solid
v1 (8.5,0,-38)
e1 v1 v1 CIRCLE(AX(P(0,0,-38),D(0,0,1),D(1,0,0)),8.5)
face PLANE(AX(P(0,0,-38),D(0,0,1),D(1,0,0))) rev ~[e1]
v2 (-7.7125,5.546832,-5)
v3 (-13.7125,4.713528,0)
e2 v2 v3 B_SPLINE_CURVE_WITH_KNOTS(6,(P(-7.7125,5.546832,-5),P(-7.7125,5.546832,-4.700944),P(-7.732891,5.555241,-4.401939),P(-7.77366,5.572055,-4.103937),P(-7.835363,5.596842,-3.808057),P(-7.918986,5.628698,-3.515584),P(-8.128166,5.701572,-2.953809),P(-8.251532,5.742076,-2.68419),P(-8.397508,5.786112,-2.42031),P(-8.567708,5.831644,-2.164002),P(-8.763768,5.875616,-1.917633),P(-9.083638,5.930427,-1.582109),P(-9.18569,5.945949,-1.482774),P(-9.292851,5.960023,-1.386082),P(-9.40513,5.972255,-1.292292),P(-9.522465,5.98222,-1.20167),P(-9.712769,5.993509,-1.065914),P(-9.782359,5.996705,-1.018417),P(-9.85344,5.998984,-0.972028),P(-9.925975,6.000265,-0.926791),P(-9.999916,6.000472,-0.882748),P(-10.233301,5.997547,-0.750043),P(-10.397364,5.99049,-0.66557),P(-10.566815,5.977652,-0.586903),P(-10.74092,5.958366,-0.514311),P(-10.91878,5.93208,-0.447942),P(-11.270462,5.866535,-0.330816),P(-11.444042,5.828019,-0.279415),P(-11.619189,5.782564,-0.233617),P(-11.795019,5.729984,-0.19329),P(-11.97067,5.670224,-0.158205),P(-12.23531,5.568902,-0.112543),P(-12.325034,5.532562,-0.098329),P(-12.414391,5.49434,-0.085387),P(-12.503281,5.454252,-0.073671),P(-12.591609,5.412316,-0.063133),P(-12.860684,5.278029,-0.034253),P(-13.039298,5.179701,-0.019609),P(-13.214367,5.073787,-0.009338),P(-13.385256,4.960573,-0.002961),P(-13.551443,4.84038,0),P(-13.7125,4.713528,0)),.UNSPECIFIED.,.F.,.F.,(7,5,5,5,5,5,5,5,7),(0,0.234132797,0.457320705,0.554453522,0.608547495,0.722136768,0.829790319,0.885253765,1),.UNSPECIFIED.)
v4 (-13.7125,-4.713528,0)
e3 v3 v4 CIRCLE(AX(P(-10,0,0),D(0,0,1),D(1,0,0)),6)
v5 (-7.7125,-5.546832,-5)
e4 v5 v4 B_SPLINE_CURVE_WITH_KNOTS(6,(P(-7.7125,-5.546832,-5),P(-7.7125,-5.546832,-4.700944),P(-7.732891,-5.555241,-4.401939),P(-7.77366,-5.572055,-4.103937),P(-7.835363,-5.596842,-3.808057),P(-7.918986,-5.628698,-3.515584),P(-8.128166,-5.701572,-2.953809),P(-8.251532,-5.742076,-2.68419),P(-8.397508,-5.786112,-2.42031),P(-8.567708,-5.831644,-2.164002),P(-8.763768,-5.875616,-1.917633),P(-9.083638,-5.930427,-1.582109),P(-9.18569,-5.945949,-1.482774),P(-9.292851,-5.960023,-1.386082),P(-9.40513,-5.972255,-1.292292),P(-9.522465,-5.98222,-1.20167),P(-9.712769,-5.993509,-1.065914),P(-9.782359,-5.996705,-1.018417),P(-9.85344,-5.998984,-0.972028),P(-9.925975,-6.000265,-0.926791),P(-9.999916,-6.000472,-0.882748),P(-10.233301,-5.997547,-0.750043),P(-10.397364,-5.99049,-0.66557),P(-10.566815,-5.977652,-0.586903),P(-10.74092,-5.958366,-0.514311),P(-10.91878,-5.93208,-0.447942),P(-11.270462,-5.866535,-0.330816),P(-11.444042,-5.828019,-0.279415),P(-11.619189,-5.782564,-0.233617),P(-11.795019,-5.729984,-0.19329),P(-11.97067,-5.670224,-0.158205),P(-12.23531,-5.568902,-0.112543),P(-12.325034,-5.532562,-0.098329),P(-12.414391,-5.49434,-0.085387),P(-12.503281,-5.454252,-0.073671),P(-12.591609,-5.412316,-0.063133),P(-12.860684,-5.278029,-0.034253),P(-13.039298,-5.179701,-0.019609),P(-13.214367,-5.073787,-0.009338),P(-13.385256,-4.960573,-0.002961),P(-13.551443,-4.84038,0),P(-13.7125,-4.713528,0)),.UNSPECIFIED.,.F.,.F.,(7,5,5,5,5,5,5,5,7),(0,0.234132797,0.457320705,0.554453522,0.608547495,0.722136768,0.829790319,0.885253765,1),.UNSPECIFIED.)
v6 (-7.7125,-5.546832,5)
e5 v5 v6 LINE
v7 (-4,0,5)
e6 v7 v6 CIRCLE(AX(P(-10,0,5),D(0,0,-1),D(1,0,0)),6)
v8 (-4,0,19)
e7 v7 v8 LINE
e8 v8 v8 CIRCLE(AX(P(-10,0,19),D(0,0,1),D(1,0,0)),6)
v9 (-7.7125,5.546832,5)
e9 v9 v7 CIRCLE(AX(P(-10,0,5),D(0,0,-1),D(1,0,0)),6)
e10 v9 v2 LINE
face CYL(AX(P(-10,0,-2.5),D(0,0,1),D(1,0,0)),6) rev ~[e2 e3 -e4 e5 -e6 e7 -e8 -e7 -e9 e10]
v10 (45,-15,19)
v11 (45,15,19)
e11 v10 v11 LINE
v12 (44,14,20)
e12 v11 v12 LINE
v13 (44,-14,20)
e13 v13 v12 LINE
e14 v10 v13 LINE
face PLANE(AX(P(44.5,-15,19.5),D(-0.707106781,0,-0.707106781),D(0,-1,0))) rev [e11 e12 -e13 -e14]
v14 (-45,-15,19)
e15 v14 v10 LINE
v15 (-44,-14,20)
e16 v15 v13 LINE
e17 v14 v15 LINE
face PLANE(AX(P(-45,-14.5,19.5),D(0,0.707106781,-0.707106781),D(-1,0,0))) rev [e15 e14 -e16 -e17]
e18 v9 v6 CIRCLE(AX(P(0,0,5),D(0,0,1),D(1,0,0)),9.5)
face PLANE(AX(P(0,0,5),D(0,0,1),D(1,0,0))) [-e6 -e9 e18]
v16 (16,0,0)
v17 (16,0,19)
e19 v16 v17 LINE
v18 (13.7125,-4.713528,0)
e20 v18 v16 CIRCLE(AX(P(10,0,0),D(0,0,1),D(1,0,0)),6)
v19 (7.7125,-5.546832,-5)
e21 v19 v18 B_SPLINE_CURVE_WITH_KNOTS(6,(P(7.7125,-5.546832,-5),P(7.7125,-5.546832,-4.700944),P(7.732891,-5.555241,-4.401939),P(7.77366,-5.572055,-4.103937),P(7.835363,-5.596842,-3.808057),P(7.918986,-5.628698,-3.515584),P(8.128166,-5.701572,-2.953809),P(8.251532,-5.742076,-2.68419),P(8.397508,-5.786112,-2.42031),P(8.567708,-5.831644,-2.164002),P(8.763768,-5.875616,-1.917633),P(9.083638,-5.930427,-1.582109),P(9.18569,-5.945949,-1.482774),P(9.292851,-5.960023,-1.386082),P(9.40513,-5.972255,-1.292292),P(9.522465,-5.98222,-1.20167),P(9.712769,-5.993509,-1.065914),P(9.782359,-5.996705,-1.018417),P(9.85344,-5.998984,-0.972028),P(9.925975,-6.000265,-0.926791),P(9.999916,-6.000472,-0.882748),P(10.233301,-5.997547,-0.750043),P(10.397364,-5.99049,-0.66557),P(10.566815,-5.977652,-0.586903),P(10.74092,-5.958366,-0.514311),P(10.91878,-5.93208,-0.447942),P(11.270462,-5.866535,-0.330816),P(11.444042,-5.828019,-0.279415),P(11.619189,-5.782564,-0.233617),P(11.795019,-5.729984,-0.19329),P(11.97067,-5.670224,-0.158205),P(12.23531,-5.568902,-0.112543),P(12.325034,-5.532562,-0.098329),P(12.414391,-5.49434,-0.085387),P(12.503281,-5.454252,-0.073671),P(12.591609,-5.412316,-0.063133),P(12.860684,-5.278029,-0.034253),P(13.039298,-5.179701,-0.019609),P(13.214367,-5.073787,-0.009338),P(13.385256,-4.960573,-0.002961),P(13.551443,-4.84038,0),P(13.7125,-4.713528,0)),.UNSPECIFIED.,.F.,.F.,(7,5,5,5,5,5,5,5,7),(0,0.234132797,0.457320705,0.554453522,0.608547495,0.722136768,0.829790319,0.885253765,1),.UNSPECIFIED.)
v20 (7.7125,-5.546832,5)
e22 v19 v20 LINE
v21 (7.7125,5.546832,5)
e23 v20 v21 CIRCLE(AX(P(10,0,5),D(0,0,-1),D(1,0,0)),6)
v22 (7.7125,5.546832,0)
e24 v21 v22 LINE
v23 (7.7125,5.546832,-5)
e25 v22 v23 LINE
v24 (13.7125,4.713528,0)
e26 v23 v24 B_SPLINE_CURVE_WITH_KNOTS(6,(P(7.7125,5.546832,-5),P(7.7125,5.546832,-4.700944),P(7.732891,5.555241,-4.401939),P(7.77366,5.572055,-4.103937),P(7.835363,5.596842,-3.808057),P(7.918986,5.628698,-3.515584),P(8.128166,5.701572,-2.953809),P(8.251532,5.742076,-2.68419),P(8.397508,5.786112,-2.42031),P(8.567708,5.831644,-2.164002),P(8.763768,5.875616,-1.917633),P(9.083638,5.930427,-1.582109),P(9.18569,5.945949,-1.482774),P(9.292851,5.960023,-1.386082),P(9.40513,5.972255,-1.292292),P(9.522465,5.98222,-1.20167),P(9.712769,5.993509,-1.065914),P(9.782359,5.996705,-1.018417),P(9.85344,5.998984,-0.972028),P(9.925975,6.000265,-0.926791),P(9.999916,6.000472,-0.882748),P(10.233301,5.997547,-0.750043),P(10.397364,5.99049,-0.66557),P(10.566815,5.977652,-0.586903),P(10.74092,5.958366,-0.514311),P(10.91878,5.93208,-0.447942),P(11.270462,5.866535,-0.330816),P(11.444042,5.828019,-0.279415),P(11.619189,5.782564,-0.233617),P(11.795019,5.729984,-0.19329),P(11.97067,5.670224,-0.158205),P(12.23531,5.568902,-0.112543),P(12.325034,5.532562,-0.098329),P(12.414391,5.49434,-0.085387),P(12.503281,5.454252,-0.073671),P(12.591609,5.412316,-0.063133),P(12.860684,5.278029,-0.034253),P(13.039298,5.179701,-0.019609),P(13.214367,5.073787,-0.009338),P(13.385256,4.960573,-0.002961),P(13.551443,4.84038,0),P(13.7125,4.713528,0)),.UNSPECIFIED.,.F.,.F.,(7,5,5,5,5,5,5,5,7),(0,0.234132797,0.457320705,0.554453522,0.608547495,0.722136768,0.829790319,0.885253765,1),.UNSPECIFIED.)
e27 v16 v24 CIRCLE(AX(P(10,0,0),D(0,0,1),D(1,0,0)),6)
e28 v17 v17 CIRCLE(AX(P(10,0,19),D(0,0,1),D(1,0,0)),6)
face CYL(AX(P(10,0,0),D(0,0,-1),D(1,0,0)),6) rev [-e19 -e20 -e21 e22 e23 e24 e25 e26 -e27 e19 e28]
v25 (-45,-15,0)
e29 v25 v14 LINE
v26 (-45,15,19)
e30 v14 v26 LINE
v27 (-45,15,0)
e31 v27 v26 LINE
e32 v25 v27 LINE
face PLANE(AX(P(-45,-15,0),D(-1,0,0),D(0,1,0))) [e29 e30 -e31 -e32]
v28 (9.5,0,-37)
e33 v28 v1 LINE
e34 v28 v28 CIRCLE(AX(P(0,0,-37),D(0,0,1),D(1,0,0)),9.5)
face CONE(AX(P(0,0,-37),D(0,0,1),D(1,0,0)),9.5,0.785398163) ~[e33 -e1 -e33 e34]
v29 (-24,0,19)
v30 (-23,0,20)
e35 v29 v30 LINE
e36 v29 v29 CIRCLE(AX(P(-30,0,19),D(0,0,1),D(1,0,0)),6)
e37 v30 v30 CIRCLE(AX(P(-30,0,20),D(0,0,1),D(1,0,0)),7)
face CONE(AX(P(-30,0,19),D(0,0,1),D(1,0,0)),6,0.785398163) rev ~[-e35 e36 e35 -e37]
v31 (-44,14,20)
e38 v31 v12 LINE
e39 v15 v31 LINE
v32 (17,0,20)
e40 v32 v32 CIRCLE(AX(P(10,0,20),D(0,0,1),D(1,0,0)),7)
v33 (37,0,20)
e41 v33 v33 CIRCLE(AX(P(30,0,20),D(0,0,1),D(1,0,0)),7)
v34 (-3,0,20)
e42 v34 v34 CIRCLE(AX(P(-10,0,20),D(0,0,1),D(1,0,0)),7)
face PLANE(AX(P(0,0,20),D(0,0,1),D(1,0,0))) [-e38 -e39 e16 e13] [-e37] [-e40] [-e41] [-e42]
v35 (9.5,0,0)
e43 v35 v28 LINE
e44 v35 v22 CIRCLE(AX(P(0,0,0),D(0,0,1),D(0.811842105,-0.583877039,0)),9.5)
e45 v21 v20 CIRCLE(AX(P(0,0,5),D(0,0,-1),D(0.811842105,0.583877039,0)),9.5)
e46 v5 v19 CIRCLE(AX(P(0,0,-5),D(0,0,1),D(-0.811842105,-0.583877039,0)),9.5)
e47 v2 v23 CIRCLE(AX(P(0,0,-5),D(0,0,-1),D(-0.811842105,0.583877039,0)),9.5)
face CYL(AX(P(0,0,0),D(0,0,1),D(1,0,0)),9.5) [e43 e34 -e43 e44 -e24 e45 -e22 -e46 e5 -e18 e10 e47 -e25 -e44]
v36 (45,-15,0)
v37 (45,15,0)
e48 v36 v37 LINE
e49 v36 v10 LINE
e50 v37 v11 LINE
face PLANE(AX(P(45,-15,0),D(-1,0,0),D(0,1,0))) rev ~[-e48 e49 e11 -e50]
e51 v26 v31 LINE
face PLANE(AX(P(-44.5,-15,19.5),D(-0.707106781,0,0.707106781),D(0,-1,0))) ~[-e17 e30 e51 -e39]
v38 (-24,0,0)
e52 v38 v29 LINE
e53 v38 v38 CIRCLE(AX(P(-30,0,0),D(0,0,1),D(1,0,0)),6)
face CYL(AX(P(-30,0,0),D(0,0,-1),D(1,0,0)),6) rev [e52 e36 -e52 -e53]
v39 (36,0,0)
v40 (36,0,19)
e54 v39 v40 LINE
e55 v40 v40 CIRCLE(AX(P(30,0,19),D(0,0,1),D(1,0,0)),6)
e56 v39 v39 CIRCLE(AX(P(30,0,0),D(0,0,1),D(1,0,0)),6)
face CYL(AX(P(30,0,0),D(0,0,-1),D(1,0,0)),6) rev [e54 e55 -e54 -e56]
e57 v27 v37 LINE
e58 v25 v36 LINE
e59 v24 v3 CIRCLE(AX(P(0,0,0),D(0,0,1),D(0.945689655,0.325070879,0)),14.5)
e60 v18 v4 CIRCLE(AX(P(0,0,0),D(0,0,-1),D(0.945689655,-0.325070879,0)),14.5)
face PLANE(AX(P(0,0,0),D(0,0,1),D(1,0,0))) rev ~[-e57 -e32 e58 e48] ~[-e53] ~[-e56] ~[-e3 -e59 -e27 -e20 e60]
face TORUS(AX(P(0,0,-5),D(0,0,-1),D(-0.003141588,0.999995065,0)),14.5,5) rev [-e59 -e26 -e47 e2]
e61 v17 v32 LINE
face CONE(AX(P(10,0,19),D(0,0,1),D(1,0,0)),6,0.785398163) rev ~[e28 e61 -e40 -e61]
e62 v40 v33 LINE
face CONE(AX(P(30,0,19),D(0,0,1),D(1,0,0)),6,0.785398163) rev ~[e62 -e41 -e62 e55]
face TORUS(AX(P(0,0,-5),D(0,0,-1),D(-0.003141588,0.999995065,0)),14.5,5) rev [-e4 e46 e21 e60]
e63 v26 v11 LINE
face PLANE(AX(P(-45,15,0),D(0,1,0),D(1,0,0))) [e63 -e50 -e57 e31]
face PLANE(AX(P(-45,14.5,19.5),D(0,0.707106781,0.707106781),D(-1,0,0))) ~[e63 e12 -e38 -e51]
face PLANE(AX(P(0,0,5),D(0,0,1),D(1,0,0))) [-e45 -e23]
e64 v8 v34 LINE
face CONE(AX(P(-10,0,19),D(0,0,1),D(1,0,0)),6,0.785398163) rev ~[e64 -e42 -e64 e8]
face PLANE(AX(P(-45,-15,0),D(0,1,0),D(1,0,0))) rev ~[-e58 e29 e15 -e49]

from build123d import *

# Parameters (mm, degrees)
F0_W          = 90
F0_H          = 30
F0_R          = 6
F1_DEPTH      = 20
F2_SIZE       = 1
F3_R          = 9.5
F4_DEPTH      = 5
F4_DEPTH_BACK = 38
F5_SIZE       = 1
F6_T4_ANGLE   = 359.64
F6_S5_R       = 6
F6_T6_DEPTH   = 29
F6_S7_R       = 6
F6_T8_DEPTH   = 29
F6_T12_ANGLE  = 359.64
F6_S13_R      = 6
F6_T14_DEPTH  = 29
F6_S15_R      = 6
F6_T16_DEPTH  = 29


# Not quite as in the source:
# - a fillet or chamfer that OpenCascade refuses, or shapes differently, is made with other operations: its cross-section is extruded or revolved along the edge and cut away or added


with BuildPart() as f1:
    # F0 (on Top) → F1 (new body)
    with BuildSketch(Plane.XY):
        Rectangle(F0_W, F0_H)
        with Locations((-30, 0)):
            Circle(F0_R, mode=Mode.SUBTRACT)
        with Locations((-10, 0)):
            Circle(F0_R, mode=Mode.SUBTRACT)
        with Locations((10, 0)):
            Circle(F0_R, mode=Mode.SUBTRACT)
        with Locations((30, 0)):
            Circle(F0_R, mode=Mode.SUBTRACT)
    extrude(amount=F1_DEPTH)

    # F2
    f2_edges = [f1.edges().sort_by_distance(p)[0] for p in [
        (0, 15, 20),
        (-45, 0, 20),
        (0, -15, 20),
        (45, 0, 20),
        (-36, 0, 20),
        (-16, 0, 20),
        (4, 0, 20),
        (24, 0, 20),
    ]]
    chamfer(f2_edges, length=F2_SIZE)

    # F3 (on Top) → F4 (join, two sides)
    with BuildSketch(Plane.XY) as f4_sk:
        Circle(F3_R)
    extrude(amount=F4_DEPTH)
    extrude(f4_sk.sketch, amount=-F4_DEPTH_BACK)

    # F5
    f5_edges = [f1.edges().sort_by_distance(p)[0] for p in [
        (-9.5, 0, -38),
    ]]
    chamfer(f5_edges, length=F5_SIZE)

    # F6: fillet of radius 5 on 2 edges, made by hand


with BuildPart() as f6_tool2:
    # F6_s3 → F6_t4 (revolve)
    with BuildSketch(Plane(origin=(0, 0, 0), x_dir=(0, 0, 1), z_dir=(0.9999950652, 0.0031415875, 0))):
        with BuildLine():
            ThreePointArc((-5, -9.5), (-1.4644660941, -10.9644660941), (0, -14.5))
            Line((0, -14.5), (0, -9.5))
            Line((0, -9.5), (-5, -9.5))
        make_face()
    revolve(axis=Axis((0, 0, 0), (0, 0, 1)), revolution_arc=F6_T4_ANGLE)

    # F6_s5 → F6_t6 (cut, symmetric)
    with BuildSketch(Plane.XY.offset(-2.5)):
        with Locations((10, 0)):
            Circle(F6_S5_R)
    extrude(amount=F6_T6_DEPTH, both=True, mode=Mode.SUBTRACT)

    # F6_s7 → F6_t8 (cut, symmetric)
    with BuildSketch(Plane.XY.offset(-2.5)):
        with Locations((-10, 0)):
            Circle(F6_S7_R)
    extrude(amount=F6_T8_DEPTH, both=True, mode=Mode.SUBTRACT)


with BuildPart() as f1_1:
    add(f1.part)

    # F6_t1: union F6_tool2
    add(f6_tool2.part)


with BuildPart() as f6_tool10:
    # F6_s11 → F6_t12 (revolve)
    with BuildSketch(Plane(origin=(0, 0, 0), x_dir=(0, 0, 1), z_dir=(-0.9999950652, -0.0031415875, 0))):
        with BuildLine():
            ThreePointArc((-5, -9.5), (-1.4644660941, -10.9644660941), (0, -14.5))
            Line((0, -14.5), (0, -9.5))
            Line((0, -9.5), (-5, -9.5))
        make_face()
    revolve(axis=Axis((0, 0, 0), (0, 0, 1)), revolution_arc=F6_T12_ANGLE)

    # F6_s13 → F6_t14 (cut, symmetric)
    with BuildSketch(Plane.XY.offset(-2.5)):
        with Locations((10, 0)):
            Circle(F6_S13_R)
    extrude(amount=F6_T14_DEPTH, both=True, mode=Mode.SUBTRACT)

    # F6_s15 → F6_t16 (cut, symmetric)
    with BuildSketch(Plane.XY.offset(-2.5)):
        with Locations((-10, 0)):
            Circle(F6_S15_R)
    extrude(amount=F6_T16_DEPTH, both=True, mode=Mode.SUBTRACT)


with BuildPart() as f1_2:
    add(f1_1.part)

    # F6_t9: union F6_tool10
    add(f6_tool10.part)


solid = f1_2.part
